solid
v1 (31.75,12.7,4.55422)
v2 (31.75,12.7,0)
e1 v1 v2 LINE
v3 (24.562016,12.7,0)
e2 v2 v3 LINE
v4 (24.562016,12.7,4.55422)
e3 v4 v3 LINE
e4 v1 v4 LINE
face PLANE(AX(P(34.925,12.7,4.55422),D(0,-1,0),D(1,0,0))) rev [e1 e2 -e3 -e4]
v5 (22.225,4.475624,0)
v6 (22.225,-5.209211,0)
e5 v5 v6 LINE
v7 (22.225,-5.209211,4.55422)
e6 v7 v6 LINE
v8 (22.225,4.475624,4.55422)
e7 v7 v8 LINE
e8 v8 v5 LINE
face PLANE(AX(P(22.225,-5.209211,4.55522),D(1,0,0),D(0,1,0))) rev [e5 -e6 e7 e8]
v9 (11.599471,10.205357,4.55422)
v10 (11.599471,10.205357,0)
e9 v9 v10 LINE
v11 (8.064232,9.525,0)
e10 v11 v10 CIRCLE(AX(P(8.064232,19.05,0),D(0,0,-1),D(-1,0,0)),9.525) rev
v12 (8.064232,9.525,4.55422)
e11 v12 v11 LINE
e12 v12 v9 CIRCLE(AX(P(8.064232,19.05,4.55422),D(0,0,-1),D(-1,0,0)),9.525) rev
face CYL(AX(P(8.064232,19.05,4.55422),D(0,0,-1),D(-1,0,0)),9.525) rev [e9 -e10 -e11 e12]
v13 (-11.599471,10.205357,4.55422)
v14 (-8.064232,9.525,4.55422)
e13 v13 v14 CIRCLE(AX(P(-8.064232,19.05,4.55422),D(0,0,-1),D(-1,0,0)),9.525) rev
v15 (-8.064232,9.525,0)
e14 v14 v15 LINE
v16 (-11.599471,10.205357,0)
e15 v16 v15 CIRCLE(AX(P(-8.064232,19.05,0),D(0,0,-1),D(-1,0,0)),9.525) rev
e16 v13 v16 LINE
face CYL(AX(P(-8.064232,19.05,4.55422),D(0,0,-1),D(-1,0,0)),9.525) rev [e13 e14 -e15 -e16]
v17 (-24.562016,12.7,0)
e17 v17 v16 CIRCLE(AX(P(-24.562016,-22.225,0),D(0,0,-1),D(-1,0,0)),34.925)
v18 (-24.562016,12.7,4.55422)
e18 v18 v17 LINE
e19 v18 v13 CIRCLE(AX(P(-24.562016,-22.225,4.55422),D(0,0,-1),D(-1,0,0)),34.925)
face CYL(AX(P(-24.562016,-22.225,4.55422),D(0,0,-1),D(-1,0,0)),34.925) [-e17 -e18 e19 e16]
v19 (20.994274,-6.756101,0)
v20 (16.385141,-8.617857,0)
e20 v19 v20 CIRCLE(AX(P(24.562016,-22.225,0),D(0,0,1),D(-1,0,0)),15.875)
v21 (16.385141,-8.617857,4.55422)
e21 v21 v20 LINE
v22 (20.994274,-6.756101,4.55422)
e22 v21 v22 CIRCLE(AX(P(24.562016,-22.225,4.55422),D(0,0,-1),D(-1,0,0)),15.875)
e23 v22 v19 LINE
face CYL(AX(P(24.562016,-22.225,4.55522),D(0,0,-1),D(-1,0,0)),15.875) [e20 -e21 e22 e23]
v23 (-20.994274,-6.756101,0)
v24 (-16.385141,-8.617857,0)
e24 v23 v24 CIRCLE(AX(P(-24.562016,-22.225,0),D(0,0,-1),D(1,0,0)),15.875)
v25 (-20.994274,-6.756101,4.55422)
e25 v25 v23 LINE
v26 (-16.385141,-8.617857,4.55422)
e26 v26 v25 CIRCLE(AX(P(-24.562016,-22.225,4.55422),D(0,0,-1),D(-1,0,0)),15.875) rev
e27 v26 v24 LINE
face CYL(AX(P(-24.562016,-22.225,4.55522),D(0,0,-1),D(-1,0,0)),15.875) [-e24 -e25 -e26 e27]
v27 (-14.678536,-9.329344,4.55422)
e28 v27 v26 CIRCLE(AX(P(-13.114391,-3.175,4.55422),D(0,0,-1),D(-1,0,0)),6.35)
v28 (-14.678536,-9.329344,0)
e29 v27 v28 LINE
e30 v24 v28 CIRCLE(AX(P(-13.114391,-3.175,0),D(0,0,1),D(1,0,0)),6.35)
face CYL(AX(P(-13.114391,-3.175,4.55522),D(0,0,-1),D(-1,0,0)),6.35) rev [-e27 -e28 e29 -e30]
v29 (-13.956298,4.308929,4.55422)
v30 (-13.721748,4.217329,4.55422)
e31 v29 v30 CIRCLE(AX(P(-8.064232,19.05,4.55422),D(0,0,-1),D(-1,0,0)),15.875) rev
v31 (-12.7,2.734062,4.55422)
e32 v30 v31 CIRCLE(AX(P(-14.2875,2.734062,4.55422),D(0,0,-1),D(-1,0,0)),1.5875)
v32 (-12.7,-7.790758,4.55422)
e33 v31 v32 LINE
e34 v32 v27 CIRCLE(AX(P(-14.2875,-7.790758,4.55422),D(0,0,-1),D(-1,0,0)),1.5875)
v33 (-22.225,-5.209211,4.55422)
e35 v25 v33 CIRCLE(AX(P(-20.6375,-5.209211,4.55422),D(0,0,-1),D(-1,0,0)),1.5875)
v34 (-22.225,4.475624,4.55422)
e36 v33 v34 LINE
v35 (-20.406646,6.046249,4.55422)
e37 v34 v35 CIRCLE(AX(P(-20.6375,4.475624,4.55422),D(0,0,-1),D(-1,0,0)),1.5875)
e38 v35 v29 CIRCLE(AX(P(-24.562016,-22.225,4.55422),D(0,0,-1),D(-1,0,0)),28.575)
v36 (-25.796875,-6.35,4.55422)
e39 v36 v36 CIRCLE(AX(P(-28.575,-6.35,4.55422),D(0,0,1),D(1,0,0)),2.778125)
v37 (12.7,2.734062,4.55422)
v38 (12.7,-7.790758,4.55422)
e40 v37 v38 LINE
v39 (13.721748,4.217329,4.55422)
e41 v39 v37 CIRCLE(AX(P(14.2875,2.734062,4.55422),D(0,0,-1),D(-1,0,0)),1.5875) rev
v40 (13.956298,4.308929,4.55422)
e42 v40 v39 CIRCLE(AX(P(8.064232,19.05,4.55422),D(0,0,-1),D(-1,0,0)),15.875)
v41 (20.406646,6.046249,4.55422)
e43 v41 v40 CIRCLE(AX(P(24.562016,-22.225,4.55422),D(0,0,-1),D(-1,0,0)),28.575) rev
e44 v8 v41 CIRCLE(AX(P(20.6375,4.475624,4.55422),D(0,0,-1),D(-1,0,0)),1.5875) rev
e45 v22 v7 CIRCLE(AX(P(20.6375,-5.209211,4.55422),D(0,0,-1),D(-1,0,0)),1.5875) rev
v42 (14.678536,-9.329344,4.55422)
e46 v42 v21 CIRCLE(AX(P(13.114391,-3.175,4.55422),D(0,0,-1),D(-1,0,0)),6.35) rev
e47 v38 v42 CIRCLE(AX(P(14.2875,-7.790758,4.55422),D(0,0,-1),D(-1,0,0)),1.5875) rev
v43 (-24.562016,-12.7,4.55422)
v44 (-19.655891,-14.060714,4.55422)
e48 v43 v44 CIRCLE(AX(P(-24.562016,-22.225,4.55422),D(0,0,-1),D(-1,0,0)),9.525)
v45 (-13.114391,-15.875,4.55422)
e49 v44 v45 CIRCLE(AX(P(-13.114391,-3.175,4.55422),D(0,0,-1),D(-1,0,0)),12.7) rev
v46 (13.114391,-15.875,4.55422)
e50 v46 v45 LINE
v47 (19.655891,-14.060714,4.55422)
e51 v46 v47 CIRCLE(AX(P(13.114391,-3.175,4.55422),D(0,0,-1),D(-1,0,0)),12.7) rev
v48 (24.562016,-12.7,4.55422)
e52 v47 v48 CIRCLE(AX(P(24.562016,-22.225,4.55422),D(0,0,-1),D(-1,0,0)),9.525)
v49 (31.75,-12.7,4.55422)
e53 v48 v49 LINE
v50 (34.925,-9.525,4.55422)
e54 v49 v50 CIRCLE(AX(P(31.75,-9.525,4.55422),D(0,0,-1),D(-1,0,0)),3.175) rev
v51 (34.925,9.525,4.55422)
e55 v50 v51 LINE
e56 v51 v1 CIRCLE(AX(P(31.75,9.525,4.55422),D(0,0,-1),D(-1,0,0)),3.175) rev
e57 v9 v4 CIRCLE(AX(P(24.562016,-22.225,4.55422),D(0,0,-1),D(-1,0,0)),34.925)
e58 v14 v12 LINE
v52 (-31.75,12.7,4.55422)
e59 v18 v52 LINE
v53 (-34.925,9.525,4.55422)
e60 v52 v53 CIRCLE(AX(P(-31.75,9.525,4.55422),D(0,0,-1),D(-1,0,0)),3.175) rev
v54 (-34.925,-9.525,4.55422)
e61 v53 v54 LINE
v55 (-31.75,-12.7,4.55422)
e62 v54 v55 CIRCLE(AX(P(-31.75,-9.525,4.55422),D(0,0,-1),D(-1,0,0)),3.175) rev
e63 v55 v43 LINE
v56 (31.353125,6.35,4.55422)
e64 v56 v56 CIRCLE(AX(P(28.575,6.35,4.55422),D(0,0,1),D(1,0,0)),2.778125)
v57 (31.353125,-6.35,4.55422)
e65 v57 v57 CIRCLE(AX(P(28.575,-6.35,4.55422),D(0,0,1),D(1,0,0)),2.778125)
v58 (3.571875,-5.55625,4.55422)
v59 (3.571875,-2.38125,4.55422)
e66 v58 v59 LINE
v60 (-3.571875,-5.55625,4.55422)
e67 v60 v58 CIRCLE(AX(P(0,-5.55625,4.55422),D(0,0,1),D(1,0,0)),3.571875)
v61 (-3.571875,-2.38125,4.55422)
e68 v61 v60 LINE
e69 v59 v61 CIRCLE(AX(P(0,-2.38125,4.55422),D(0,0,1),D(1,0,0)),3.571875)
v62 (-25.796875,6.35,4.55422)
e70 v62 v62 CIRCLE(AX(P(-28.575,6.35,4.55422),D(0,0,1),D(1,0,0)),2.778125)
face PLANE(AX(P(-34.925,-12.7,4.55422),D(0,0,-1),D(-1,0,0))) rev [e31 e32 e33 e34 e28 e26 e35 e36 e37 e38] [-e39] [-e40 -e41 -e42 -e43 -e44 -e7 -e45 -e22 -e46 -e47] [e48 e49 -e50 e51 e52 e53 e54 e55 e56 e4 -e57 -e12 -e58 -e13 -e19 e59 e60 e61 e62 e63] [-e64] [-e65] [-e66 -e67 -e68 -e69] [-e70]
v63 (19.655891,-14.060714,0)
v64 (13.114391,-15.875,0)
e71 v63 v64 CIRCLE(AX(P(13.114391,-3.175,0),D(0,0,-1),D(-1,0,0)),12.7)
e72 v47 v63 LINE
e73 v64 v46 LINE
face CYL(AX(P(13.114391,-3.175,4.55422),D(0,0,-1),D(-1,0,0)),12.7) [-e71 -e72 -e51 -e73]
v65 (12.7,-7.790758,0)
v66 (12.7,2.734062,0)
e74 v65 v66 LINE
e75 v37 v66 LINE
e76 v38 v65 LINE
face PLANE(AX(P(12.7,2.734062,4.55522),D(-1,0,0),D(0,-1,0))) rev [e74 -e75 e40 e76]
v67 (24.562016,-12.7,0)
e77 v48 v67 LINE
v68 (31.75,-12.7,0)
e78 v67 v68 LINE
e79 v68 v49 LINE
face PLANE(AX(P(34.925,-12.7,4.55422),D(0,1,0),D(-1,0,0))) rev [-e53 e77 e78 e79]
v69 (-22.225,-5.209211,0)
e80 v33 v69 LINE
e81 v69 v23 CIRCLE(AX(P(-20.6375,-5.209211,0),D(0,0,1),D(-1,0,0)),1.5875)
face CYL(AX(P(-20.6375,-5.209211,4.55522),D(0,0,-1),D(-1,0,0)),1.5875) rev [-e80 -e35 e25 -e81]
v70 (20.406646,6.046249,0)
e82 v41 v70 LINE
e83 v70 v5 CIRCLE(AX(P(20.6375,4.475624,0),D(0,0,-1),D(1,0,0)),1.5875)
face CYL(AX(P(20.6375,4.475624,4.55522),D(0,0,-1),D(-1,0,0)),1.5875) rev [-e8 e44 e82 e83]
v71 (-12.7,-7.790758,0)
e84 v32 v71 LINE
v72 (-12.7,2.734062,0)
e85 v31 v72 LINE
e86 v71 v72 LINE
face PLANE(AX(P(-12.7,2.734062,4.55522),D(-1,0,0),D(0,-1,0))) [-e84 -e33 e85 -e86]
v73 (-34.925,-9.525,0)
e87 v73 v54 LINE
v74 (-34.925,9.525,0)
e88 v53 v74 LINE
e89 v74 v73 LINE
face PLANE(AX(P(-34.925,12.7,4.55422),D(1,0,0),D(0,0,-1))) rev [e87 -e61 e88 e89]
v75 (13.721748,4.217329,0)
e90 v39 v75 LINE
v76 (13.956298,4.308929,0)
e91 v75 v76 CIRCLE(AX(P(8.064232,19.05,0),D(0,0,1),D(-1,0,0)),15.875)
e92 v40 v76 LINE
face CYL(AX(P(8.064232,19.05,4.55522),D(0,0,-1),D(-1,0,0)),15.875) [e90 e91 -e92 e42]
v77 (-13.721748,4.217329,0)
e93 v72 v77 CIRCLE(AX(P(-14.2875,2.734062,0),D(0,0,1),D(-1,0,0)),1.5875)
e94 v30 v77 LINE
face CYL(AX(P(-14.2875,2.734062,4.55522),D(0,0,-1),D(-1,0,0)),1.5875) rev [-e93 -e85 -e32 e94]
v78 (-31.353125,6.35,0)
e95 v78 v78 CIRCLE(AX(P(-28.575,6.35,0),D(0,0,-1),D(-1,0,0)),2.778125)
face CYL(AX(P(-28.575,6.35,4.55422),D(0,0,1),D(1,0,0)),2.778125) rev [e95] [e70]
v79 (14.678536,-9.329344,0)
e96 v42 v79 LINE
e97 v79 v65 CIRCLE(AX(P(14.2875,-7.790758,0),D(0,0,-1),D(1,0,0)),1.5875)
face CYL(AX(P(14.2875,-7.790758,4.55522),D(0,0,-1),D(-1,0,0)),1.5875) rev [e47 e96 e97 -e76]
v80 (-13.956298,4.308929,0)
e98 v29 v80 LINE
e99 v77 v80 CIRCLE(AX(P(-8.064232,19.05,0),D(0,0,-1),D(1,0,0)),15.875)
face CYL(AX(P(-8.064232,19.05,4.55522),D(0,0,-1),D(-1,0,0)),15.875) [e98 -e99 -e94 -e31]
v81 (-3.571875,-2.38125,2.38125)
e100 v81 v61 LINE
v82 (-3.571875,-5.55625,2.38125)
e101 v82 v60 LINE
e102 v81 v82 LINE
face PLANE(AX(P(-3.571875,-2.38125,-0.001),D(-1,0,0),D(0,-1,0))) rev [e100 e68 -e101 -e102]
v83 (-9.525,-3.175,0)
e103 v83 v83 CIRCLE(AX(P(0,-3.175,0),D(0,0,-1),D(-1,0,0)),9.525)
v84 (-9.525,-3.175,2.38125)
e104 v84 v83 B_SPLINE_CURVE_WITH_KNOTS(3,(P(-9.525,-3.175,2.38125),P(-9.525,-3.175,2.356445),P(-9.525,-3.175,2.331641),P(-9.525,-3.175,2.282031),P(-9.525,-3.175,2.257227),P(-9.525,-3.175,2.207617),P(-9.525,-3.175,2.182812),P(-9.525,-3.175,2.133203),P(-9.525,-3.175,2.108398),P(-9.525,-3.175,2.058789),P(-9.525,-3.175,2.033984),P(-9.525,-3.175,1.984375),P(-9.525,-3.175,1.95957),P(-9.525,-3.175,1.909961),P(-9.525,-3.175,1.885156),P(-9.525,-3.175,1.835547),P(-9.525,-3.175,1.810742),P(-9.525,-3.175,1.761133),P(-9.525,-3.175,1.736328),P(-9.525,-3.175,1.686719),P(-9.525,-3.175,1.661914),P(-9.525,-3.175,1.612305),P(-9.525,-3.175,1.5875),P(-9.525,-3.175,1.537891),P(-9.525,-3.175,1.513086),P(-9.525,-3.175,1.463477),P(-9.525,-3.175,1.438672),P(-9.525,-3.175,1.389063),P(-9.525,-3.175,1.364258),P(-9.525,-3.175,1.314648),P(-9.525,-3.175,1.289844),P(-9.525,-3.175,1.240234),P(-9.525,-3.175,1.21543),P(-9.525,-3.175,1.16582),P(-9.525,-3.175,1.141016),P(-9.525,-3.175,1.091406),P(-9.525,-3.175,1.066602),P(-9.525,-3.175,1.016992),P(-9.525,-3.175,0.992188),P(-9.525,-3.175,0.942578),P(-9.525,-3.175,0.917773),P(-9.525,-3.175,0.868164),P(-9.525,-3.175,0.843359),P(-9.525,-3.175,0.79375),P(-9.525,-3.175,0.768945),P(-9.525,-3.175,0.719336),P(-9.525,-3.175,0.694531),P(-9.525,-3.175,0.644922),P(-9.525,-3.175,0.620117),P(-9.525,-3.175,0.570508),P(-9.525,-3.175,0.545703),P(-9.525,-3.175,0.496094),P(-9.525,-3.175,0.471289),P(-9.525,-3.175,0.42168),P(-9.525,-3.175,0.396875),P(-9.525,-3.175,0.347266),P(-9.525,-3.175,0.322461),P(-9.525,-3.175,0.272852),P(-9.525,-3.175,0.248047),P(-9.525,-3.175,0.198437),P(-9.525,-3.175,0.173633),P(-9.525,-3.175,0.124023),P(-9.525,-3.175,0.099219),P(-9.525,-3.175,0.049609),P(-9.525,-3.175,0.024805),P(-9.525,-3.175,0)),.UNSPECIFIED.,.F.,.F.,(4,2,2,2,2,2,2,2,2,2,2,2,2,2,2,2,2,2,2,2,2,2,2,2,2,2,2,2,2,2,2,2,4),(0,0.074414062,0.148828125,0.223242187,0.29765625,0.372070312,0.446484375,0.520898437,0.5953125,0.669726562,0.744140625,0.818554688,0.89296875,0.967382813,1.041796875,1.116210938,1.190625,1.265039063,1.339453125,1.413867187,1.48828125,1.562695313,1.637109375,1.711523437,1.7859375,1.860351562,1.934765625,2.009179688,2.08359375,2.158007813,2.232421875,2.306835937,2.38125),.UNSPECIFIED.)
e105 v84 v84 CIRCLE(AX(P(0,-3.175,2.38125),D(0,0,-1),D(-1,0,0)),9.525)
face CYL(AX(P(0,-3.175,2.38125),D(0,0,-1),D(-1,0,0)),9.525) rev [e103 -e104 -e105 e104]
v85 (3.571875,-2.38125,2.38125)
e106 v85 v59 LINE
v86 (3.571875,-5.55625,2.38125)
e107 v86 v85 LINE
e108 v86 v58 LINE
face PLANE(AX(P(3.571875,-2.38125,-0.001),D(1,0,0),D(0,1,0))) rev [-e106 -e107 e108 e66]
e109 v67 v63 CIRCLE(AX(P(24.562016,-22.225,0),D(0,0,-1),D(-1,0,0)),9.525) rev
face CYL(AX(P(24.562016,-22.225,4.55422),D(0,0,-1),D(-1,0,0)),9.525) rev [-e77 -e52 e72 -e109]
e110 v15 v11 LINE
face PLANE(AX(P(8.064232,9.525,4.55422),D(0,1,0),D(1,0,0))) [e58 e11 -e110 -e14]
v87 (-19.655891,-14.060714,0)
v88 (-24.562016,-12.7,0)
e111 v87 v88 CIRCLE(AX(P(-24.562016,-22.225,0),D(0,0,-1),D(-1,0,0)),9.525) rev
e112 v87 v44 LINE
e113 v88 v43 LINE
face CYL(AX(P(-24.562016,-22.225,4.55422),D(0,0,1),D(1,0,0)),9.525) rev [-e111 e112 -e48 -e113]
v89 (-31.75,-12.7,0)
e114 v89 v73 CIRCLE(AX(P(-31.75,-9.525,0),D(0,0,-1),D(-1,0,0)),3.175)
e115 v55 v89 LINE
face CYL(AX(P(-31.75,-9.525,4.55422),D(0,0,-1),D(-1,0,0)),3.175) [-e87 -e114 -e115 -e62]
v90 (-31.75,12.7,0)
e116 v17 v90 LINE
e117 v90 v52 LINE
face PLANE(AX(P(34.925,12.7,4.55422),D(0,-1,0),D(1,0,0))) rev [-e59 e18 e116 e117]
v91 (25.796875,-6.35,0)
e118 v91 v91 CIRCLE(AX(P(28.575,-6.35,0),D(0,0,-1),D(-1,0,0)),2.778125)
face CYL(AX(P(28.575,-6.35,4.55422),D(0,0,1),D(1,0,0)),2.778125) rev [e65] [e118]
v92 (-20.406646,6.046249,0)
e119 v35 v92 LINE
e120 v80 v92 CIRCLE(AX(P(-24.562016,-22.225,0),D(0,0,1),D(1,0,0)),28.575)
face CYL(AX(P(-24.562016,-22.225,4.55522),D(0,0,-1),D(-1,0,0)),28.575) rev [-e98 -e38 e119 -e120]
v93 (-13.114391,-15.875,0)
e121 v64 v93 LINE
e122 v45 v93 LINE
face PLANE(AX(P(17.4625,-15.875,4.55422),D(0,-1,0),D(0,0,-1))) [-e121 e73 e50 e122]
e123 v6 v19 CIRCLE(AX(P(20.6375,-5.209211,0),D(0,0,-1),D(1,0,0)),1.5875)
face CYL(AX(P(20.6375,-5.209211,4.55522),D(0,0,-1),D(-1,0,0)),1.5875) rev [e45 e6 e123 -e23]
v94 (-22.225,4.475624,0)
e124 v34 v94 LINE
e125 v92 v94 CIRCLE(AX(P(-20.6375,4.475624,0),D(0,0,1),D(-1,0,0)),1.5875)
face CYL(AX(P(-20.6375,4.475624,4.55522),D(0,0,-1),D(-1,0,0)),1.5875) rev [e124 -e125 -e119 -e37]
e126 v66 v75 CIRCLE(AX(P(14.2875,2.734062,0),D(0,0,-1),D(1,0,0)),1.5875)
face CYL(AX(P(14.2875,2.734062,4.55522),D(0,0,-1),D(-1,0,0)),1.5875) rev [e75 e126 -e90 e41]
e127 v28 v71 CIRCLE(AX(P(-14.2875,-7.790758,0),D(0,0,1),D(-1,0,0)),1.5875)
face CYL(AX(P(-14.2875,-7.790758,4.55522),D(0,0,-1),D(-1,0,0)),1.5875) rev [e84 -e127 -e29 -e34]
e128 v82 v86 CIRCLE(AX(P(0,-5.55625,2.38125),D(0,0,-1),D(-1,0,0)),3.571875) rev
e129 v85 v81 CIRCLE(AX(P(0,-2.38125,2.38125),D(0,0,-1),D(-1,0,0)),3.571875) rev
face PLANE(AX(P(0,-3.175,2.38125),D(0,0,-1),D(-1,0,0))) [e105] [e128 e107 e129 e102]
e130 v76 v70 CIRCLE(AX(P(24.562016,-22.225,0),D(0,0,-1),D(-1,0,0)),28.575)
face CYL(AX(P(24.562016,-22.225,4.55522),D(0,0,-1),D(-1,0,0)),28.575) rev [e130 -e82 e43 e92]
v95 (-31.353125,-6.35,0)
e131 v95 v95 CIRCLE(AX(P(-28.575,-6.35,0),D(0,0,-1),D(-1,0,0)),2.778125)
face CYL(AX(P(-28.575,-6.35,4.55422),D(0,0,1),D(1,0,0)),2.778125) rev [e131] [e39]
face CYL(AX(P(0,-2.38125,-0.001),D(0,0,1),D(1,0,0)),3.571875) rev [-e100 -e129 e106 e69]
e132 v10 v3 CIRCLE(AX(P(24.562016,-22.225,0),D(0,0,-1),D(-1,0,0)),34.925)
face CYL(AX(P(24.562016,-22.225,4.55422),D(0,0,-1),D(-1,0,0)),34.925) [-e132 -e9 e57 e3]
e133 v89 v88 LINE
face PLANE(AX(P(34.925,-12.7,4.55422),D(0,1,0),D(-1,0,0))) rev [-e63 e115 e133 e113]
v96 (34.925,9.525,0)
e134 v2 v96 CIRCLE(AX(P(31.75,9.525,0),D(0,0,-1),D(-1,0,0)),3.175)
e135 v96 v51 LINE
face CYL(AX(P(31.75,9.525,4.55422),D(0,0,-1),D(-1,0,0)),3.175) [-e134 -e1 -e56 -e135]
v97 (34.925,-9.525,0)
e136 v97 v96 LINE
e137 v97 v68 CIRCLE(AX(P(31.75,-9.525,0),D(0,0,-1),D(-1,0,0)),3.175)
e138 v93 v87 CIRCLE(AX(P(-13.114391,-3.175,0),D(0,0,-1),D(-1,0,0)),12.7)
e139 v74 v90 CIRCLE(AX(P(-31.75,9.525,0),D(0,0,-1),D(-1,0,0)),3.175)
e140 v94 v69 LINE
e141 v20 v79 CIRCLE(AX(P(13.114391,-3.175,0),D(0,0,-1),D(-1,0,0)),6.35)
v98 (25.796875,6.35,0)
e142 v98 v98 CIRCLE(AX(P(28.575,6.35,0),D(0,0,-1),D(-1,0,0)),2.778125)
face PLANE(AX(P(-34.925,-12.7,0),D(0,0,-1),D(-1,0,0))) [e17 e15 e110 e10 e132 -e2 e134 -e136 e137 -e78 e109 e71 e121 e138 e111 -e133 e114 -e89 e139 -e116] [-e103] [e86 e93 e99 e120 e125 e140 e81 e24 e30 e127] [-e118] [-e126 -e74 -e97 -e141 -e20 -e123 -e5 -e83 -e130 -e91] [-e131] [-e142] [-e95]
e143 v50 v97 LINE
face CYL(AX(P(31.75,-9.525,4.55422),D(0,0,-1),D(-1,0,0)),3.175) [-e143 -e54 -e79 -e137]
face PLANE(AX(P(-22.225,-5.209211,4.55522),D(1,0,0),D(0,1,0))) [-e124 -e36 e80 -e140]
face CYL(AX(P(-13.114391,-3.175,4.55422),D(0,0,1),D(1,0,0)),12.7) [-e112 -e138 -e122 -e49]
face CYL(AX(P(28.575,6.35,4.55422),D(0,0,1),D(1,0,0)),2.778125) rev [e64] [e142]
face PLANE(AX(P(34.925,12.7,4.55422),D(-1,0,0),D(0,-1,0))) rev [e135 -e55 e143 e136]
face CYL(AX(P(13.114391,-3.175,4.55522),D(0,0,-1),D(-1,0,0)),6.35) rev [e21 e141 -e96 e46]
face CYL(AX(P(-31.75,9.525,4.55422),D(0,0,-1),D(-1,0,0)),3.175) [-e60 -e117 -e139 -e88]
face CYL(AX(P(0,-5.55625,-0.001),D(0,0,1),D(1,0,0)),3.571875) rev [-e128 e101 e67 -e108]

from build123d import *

# Parameters (mm, degrees)
SKETCH1_W                       = 69.85
SKETCH1_H                       = 25.4
BASE_FLANGE1_DEPTH              = 4.55422
F_7_32_0_21875_DIAMETER_HOLE1_D = 5.55625
BREAK_CORNER1_DEPTH             = 4.55422
SKETCH4_W                       = 34.925
SKETCH4_H                       = 3.175
TAB1_DEPTH                      = 4.55422
FILLET1_R                       = 9.525
CUT_EXTRUDE1_REACH              = 40.633
SKETCH7_R                       = 9.525
CUT_EXTRUDE3_DEPTH              = 2.38125
F_9_32_0_28125_DIAMETER_HOLE1_D = 7.14375
FILLET3_R                       = 12.7
CUT_EXTRUDE4_START              = -2.17297
CUT_EXTRUDE4_DEPTH              = 2.17297
CUT_EXTRUDE5_REACH              = 40.633


# Read off the part's stored shape, not the designer's step: Break-Corner1
# Sheet-metal steps are written as plain solids
with BuildPart() as part:
    # Sketch1 → Base-Flange1 (new body)
    with BuildSketch(Plane.XY):
        Rectangle(SKETCH1_W, SKETCH1_H)
    extrude(amount=BASE_FLANGE1_DEPTH)

    # 7/32 (0.21875) Diameter Hole1 (through all)
    with Locations(Plane.XY.offset(4.55422)):
        with Locations((-28.575, 6.35), (-28.575, -6.35), (28.575, 6.35), (28.575, -6.35)):
            Hole(F_7_32_0_21875_DIAMETER_HOLE1_D / 2)

    # Break-Corner1 outline → Break-Corner1 (cut)
    with BuildSketch(Plane.XY):
        with BuildLine():
            Line((34.925, -12.7), (34.925, -9.525))
            ThreePointArc((34.925, -9.525), (33.99506403, -11.77006403), (31.75, -12.7))
            Line((31.75, -12.7), (34.925, -12.7))
        make_face()
        with BuildLine():
            ThreePointArc((31.75, 12.7), (33.99506403, 11.77006403), (34.925, 9.525))
            Line((34.925, 9.525), (34.925, 12.7))
            Line((34.925, 12.7), (31.75, 12.7))
        make_face()
        with BuildLine():
            Line((-34.925, -12.7), (-31.75, -12.7))
            ThreePointArc((-31.75, -12.7), (-33.99506403, -11.77006403), (-34.925, -9.525))
            Line((-34.925, -9.525), (-34.925, -12.7))
        make_face()
        with BuildLine():
            ThreePointArc((-34.925, 9.525), (-33.99506403, 11.77006403), (-31.75, 12.7))
            Line((-31.75, 12.7), (-34.925, 12.7))
            Line((-34.925, 12.7), (-34.925, 9.525))
        make_face()
    extrude(amount=BREAK_CORNER1_DEPTH, mode=Mode.SUBTRACT)

    # Sketch4 → Tab1 (add)
    with BuildSketch(Plane(origin=(0, 0, 0), x_dir=(-1, 0, 0), z_dir=(0, 0, -1))):
        with Locations((0, -14.2875)):
            Rectangle(SKETCH4_W, SKETCH4_H)
    extrude(amount=-TAB1_DEPTH)

    # Fillet1
    # the kernel refuses this fillet: 9.525 mm, written as the material it adds along each edge
    with BuildSketch(Plane(origin=(-17.4625, -12.7, 0), x_dir=(-1, 0, 0), z_dir=(0, 0, 1))) as fillet1_piece_1:
        with BuildLine():
            CenterArc((7.099515829, 9.525), FILLET1_R, 221.810314896, 48.189685104)
            Line((0, 3.175), (-0.141990317, 3.048))
            ThreePointArc((-0.141990317, 3.048), (-0.1905, 1.5875), (-0.1905, 0))
            Line((-0.1905, 0), (0, -0.1905))
            Line((0, -0.1905), (7.099515829, -0.1905))
            Line((7.099515829, -0.1905), (7.099515829, 0))
        make_face()
    extrude(amount=4.55422)
    with BuildSketch(Plane(origin=(17.4625, -12.7, 0), x_dir=(1, 0, 0), z_dir=(0, 0, 1))) as fillet1_piece_2:
        with BuildLine():
            CenterArc((7.099515829, -9.525), FILLET1_R, 90, 48.189685104)
            Line((0, -3.175), (-0.141990317, -3.048))
            ThreePointArc((-0.141990317, -3.048), (-0.1905, -1.5875), (-0.1905, 0))
            Line((-0.1905, 0), (0, 0.1905))
            Line((0, 0.1905), (7.099515829, 0.1905))
            Line((7.099515829, 0.1905), (7.099515829, 0))
        make_face()
    extrude(amount=4.55422)

    # Sketch5 → Cut-Extrude1 (cut, up to next)
    with BuildSketch(Plane(origin=(0, 0, 0), x_dir=(-1, 0, 0), z_dir=(0, 0, -1)), mode=Mode.PRIVATE) as cut_extrude1_sk1:
        with BuildLine():
            Line((-8.064231886, 9.525), (8.064231886, 9.525))
            ThreePointArc((8.064231886, 9.525), (9.864287689, 9.69663568), (11.599471303, 10.205357143))
            ThreePointArc((11.599471303, 10.205357143), (17.961811219, 12.070669174), (24.562015829, 12.7))
            Line((24.562015829, 12.7), (-24.562015829, 12.7))
            ThreePointArc((-24.562015829, 12.7), (-17.961811219, 12.070669174), (-11.599471303, 10.205357143))
            ThreePointArc((-11.599471303, 10.205357143), (-9.864287689, 9.69663568), (-8.064231886, 9.525))
        make_face()
    cut_extrude1_tool1 = extrude(cut_extrude1_sk1.sketch, amount=-CUT_EXTRUDE1_REACH, mode=Mode.PRIVATE) & part.part
    add(cut_extrude1_tool1.solids().sort_by_distance((0, 11.328032, 0))[0], mode=Mode.SUBTRACT)

    # Sketch7 → Cut-Extrude3 (cut)
    with BuildSketch(Plane(origin=(0, 0, 0), x_dir=(-1, 0, 0), z_dir=(0, 0, -1))):
        with Locations((0, -3.175)):
            Circle(SKETCH7_R)
    extrude(amount=-CUT_EXTRUDE3_DEPTH, mode=Mode.SUBTRACT)

    # 9/32 (0.28125) Diameter Hole1 (through all)
    with Locations(Plane(origin=(0, 0, 2.38125), x_dir=(-1, 0, 0), z_dir=(0, 0, -1))):
        with Locations((0, -3.175)):
            Hole(F_9_32_0_28125_DIAMETER_HOLE1_D / 2)

    # Fillet3
    fillet3_edges = [part.edges().sort_by_distance(p)[0] for p in [
        (17.4625, -15.875, 2.27711),
        (-17.4625, -15.875, 2.27711),
    ]]
    fillet(fillet3_edges, radius=FILLET3_R)

    # Sketch10 → Cut-Extrude4 (cut)
    with BuildSketch(Plane.XY.offset(4.55422).offset(CUT_EXTRUDE4_START)):
        with BuildLine():
            Line((3.571875, -2.38125), (3.571875, -5.55625))
            ThreePointArc((3.571875, -5.55625), (0, -9.128125), (-3.571875, -5.55625))
            Line((-3.571875, -5.55625), (-3.571875, -2.38125))
            ThreePointArc((-3.571875, -2.38125), (0, 1.190625), (3.571875, -2.38125))
        make_face()
    extrude(amount=CUT_EXTRUDE4_DEPTH, mode=Mode.SUBTRACT)

    # Sketch11 → Cut-Extrude5 (cut, up to next)
    with BuildSketch(Plane(origin=(0, 0, 0), x_dir=(-1, 0, 0), z_dir=(0, 0, -1)), mode=Mode.PRIVATE) as cut_extrude5_sk1:
        with BuildLine():
            Line((-22.225, -5.20921081), (-22.225, 4.475624183))
            ThreePointArc((-22.225, 4.475624183), (-21.675207986, 5.677006048), (-20.406646128, 6.046249135))
            ThreePointArc((-20.406646128, 6.046249135), (-17.13052876, 5.366731097), (-13.95629758, 4.308928571))
            ThreePointArc((-13.95629758, 4.308928571), (-13.839204583, 4.262663683), (-13.721748353, 4.217328884))
            ThreePointArc((-13.721748353, 4.217328884), (-12.980157851, 3.634624239), (-12.7, 2.734061773))
            Line((-12.7, 2.734061773), (-12.7, -7.790757838))
            ThreePointArc((-12.7, -7.790757838), (-13.312978112, -9.043939125), (-14.67853649, -9.329343784))
            ThreePointArc((-14.67853649, -9.329343784), (-15.557873342, -9.03604869), (-16.385140615, -8.617857143))
            ThreePointArc((-16.385140615, -8.617857143), (-18.616383766, -7.505452304), (-20.994274166, -6.756100736))
            ThreePointArc((-20.994274166, -6.756100736), (-21.879783228, -6.197587575), (-22.225, -5.20921081))
        make_face()
    cut_extrude5_tool1 = extrude(cut_extrude5_sk1.sketch, amount=-CUT_EXTRUDE5_REACH, mode=Mode.PRIVATE) & part.part
    cut_extrude5 = cut_extrude5_tool1.solids().sort_by_distance((17.387748, -1.405717, 0))[0]
    add(cut_extrude5, mode=Mode.SUBTRACT)

    # Mirror1: Cut-Extrude5 across plane
    add(cut_extrude5.mirror(Plane(origin=(0, 0, 0), x_dir=(0, 0, 1), z_dir=(1, 0, 0))), mode=Mode.SUBTRACT)


solid = part.part
